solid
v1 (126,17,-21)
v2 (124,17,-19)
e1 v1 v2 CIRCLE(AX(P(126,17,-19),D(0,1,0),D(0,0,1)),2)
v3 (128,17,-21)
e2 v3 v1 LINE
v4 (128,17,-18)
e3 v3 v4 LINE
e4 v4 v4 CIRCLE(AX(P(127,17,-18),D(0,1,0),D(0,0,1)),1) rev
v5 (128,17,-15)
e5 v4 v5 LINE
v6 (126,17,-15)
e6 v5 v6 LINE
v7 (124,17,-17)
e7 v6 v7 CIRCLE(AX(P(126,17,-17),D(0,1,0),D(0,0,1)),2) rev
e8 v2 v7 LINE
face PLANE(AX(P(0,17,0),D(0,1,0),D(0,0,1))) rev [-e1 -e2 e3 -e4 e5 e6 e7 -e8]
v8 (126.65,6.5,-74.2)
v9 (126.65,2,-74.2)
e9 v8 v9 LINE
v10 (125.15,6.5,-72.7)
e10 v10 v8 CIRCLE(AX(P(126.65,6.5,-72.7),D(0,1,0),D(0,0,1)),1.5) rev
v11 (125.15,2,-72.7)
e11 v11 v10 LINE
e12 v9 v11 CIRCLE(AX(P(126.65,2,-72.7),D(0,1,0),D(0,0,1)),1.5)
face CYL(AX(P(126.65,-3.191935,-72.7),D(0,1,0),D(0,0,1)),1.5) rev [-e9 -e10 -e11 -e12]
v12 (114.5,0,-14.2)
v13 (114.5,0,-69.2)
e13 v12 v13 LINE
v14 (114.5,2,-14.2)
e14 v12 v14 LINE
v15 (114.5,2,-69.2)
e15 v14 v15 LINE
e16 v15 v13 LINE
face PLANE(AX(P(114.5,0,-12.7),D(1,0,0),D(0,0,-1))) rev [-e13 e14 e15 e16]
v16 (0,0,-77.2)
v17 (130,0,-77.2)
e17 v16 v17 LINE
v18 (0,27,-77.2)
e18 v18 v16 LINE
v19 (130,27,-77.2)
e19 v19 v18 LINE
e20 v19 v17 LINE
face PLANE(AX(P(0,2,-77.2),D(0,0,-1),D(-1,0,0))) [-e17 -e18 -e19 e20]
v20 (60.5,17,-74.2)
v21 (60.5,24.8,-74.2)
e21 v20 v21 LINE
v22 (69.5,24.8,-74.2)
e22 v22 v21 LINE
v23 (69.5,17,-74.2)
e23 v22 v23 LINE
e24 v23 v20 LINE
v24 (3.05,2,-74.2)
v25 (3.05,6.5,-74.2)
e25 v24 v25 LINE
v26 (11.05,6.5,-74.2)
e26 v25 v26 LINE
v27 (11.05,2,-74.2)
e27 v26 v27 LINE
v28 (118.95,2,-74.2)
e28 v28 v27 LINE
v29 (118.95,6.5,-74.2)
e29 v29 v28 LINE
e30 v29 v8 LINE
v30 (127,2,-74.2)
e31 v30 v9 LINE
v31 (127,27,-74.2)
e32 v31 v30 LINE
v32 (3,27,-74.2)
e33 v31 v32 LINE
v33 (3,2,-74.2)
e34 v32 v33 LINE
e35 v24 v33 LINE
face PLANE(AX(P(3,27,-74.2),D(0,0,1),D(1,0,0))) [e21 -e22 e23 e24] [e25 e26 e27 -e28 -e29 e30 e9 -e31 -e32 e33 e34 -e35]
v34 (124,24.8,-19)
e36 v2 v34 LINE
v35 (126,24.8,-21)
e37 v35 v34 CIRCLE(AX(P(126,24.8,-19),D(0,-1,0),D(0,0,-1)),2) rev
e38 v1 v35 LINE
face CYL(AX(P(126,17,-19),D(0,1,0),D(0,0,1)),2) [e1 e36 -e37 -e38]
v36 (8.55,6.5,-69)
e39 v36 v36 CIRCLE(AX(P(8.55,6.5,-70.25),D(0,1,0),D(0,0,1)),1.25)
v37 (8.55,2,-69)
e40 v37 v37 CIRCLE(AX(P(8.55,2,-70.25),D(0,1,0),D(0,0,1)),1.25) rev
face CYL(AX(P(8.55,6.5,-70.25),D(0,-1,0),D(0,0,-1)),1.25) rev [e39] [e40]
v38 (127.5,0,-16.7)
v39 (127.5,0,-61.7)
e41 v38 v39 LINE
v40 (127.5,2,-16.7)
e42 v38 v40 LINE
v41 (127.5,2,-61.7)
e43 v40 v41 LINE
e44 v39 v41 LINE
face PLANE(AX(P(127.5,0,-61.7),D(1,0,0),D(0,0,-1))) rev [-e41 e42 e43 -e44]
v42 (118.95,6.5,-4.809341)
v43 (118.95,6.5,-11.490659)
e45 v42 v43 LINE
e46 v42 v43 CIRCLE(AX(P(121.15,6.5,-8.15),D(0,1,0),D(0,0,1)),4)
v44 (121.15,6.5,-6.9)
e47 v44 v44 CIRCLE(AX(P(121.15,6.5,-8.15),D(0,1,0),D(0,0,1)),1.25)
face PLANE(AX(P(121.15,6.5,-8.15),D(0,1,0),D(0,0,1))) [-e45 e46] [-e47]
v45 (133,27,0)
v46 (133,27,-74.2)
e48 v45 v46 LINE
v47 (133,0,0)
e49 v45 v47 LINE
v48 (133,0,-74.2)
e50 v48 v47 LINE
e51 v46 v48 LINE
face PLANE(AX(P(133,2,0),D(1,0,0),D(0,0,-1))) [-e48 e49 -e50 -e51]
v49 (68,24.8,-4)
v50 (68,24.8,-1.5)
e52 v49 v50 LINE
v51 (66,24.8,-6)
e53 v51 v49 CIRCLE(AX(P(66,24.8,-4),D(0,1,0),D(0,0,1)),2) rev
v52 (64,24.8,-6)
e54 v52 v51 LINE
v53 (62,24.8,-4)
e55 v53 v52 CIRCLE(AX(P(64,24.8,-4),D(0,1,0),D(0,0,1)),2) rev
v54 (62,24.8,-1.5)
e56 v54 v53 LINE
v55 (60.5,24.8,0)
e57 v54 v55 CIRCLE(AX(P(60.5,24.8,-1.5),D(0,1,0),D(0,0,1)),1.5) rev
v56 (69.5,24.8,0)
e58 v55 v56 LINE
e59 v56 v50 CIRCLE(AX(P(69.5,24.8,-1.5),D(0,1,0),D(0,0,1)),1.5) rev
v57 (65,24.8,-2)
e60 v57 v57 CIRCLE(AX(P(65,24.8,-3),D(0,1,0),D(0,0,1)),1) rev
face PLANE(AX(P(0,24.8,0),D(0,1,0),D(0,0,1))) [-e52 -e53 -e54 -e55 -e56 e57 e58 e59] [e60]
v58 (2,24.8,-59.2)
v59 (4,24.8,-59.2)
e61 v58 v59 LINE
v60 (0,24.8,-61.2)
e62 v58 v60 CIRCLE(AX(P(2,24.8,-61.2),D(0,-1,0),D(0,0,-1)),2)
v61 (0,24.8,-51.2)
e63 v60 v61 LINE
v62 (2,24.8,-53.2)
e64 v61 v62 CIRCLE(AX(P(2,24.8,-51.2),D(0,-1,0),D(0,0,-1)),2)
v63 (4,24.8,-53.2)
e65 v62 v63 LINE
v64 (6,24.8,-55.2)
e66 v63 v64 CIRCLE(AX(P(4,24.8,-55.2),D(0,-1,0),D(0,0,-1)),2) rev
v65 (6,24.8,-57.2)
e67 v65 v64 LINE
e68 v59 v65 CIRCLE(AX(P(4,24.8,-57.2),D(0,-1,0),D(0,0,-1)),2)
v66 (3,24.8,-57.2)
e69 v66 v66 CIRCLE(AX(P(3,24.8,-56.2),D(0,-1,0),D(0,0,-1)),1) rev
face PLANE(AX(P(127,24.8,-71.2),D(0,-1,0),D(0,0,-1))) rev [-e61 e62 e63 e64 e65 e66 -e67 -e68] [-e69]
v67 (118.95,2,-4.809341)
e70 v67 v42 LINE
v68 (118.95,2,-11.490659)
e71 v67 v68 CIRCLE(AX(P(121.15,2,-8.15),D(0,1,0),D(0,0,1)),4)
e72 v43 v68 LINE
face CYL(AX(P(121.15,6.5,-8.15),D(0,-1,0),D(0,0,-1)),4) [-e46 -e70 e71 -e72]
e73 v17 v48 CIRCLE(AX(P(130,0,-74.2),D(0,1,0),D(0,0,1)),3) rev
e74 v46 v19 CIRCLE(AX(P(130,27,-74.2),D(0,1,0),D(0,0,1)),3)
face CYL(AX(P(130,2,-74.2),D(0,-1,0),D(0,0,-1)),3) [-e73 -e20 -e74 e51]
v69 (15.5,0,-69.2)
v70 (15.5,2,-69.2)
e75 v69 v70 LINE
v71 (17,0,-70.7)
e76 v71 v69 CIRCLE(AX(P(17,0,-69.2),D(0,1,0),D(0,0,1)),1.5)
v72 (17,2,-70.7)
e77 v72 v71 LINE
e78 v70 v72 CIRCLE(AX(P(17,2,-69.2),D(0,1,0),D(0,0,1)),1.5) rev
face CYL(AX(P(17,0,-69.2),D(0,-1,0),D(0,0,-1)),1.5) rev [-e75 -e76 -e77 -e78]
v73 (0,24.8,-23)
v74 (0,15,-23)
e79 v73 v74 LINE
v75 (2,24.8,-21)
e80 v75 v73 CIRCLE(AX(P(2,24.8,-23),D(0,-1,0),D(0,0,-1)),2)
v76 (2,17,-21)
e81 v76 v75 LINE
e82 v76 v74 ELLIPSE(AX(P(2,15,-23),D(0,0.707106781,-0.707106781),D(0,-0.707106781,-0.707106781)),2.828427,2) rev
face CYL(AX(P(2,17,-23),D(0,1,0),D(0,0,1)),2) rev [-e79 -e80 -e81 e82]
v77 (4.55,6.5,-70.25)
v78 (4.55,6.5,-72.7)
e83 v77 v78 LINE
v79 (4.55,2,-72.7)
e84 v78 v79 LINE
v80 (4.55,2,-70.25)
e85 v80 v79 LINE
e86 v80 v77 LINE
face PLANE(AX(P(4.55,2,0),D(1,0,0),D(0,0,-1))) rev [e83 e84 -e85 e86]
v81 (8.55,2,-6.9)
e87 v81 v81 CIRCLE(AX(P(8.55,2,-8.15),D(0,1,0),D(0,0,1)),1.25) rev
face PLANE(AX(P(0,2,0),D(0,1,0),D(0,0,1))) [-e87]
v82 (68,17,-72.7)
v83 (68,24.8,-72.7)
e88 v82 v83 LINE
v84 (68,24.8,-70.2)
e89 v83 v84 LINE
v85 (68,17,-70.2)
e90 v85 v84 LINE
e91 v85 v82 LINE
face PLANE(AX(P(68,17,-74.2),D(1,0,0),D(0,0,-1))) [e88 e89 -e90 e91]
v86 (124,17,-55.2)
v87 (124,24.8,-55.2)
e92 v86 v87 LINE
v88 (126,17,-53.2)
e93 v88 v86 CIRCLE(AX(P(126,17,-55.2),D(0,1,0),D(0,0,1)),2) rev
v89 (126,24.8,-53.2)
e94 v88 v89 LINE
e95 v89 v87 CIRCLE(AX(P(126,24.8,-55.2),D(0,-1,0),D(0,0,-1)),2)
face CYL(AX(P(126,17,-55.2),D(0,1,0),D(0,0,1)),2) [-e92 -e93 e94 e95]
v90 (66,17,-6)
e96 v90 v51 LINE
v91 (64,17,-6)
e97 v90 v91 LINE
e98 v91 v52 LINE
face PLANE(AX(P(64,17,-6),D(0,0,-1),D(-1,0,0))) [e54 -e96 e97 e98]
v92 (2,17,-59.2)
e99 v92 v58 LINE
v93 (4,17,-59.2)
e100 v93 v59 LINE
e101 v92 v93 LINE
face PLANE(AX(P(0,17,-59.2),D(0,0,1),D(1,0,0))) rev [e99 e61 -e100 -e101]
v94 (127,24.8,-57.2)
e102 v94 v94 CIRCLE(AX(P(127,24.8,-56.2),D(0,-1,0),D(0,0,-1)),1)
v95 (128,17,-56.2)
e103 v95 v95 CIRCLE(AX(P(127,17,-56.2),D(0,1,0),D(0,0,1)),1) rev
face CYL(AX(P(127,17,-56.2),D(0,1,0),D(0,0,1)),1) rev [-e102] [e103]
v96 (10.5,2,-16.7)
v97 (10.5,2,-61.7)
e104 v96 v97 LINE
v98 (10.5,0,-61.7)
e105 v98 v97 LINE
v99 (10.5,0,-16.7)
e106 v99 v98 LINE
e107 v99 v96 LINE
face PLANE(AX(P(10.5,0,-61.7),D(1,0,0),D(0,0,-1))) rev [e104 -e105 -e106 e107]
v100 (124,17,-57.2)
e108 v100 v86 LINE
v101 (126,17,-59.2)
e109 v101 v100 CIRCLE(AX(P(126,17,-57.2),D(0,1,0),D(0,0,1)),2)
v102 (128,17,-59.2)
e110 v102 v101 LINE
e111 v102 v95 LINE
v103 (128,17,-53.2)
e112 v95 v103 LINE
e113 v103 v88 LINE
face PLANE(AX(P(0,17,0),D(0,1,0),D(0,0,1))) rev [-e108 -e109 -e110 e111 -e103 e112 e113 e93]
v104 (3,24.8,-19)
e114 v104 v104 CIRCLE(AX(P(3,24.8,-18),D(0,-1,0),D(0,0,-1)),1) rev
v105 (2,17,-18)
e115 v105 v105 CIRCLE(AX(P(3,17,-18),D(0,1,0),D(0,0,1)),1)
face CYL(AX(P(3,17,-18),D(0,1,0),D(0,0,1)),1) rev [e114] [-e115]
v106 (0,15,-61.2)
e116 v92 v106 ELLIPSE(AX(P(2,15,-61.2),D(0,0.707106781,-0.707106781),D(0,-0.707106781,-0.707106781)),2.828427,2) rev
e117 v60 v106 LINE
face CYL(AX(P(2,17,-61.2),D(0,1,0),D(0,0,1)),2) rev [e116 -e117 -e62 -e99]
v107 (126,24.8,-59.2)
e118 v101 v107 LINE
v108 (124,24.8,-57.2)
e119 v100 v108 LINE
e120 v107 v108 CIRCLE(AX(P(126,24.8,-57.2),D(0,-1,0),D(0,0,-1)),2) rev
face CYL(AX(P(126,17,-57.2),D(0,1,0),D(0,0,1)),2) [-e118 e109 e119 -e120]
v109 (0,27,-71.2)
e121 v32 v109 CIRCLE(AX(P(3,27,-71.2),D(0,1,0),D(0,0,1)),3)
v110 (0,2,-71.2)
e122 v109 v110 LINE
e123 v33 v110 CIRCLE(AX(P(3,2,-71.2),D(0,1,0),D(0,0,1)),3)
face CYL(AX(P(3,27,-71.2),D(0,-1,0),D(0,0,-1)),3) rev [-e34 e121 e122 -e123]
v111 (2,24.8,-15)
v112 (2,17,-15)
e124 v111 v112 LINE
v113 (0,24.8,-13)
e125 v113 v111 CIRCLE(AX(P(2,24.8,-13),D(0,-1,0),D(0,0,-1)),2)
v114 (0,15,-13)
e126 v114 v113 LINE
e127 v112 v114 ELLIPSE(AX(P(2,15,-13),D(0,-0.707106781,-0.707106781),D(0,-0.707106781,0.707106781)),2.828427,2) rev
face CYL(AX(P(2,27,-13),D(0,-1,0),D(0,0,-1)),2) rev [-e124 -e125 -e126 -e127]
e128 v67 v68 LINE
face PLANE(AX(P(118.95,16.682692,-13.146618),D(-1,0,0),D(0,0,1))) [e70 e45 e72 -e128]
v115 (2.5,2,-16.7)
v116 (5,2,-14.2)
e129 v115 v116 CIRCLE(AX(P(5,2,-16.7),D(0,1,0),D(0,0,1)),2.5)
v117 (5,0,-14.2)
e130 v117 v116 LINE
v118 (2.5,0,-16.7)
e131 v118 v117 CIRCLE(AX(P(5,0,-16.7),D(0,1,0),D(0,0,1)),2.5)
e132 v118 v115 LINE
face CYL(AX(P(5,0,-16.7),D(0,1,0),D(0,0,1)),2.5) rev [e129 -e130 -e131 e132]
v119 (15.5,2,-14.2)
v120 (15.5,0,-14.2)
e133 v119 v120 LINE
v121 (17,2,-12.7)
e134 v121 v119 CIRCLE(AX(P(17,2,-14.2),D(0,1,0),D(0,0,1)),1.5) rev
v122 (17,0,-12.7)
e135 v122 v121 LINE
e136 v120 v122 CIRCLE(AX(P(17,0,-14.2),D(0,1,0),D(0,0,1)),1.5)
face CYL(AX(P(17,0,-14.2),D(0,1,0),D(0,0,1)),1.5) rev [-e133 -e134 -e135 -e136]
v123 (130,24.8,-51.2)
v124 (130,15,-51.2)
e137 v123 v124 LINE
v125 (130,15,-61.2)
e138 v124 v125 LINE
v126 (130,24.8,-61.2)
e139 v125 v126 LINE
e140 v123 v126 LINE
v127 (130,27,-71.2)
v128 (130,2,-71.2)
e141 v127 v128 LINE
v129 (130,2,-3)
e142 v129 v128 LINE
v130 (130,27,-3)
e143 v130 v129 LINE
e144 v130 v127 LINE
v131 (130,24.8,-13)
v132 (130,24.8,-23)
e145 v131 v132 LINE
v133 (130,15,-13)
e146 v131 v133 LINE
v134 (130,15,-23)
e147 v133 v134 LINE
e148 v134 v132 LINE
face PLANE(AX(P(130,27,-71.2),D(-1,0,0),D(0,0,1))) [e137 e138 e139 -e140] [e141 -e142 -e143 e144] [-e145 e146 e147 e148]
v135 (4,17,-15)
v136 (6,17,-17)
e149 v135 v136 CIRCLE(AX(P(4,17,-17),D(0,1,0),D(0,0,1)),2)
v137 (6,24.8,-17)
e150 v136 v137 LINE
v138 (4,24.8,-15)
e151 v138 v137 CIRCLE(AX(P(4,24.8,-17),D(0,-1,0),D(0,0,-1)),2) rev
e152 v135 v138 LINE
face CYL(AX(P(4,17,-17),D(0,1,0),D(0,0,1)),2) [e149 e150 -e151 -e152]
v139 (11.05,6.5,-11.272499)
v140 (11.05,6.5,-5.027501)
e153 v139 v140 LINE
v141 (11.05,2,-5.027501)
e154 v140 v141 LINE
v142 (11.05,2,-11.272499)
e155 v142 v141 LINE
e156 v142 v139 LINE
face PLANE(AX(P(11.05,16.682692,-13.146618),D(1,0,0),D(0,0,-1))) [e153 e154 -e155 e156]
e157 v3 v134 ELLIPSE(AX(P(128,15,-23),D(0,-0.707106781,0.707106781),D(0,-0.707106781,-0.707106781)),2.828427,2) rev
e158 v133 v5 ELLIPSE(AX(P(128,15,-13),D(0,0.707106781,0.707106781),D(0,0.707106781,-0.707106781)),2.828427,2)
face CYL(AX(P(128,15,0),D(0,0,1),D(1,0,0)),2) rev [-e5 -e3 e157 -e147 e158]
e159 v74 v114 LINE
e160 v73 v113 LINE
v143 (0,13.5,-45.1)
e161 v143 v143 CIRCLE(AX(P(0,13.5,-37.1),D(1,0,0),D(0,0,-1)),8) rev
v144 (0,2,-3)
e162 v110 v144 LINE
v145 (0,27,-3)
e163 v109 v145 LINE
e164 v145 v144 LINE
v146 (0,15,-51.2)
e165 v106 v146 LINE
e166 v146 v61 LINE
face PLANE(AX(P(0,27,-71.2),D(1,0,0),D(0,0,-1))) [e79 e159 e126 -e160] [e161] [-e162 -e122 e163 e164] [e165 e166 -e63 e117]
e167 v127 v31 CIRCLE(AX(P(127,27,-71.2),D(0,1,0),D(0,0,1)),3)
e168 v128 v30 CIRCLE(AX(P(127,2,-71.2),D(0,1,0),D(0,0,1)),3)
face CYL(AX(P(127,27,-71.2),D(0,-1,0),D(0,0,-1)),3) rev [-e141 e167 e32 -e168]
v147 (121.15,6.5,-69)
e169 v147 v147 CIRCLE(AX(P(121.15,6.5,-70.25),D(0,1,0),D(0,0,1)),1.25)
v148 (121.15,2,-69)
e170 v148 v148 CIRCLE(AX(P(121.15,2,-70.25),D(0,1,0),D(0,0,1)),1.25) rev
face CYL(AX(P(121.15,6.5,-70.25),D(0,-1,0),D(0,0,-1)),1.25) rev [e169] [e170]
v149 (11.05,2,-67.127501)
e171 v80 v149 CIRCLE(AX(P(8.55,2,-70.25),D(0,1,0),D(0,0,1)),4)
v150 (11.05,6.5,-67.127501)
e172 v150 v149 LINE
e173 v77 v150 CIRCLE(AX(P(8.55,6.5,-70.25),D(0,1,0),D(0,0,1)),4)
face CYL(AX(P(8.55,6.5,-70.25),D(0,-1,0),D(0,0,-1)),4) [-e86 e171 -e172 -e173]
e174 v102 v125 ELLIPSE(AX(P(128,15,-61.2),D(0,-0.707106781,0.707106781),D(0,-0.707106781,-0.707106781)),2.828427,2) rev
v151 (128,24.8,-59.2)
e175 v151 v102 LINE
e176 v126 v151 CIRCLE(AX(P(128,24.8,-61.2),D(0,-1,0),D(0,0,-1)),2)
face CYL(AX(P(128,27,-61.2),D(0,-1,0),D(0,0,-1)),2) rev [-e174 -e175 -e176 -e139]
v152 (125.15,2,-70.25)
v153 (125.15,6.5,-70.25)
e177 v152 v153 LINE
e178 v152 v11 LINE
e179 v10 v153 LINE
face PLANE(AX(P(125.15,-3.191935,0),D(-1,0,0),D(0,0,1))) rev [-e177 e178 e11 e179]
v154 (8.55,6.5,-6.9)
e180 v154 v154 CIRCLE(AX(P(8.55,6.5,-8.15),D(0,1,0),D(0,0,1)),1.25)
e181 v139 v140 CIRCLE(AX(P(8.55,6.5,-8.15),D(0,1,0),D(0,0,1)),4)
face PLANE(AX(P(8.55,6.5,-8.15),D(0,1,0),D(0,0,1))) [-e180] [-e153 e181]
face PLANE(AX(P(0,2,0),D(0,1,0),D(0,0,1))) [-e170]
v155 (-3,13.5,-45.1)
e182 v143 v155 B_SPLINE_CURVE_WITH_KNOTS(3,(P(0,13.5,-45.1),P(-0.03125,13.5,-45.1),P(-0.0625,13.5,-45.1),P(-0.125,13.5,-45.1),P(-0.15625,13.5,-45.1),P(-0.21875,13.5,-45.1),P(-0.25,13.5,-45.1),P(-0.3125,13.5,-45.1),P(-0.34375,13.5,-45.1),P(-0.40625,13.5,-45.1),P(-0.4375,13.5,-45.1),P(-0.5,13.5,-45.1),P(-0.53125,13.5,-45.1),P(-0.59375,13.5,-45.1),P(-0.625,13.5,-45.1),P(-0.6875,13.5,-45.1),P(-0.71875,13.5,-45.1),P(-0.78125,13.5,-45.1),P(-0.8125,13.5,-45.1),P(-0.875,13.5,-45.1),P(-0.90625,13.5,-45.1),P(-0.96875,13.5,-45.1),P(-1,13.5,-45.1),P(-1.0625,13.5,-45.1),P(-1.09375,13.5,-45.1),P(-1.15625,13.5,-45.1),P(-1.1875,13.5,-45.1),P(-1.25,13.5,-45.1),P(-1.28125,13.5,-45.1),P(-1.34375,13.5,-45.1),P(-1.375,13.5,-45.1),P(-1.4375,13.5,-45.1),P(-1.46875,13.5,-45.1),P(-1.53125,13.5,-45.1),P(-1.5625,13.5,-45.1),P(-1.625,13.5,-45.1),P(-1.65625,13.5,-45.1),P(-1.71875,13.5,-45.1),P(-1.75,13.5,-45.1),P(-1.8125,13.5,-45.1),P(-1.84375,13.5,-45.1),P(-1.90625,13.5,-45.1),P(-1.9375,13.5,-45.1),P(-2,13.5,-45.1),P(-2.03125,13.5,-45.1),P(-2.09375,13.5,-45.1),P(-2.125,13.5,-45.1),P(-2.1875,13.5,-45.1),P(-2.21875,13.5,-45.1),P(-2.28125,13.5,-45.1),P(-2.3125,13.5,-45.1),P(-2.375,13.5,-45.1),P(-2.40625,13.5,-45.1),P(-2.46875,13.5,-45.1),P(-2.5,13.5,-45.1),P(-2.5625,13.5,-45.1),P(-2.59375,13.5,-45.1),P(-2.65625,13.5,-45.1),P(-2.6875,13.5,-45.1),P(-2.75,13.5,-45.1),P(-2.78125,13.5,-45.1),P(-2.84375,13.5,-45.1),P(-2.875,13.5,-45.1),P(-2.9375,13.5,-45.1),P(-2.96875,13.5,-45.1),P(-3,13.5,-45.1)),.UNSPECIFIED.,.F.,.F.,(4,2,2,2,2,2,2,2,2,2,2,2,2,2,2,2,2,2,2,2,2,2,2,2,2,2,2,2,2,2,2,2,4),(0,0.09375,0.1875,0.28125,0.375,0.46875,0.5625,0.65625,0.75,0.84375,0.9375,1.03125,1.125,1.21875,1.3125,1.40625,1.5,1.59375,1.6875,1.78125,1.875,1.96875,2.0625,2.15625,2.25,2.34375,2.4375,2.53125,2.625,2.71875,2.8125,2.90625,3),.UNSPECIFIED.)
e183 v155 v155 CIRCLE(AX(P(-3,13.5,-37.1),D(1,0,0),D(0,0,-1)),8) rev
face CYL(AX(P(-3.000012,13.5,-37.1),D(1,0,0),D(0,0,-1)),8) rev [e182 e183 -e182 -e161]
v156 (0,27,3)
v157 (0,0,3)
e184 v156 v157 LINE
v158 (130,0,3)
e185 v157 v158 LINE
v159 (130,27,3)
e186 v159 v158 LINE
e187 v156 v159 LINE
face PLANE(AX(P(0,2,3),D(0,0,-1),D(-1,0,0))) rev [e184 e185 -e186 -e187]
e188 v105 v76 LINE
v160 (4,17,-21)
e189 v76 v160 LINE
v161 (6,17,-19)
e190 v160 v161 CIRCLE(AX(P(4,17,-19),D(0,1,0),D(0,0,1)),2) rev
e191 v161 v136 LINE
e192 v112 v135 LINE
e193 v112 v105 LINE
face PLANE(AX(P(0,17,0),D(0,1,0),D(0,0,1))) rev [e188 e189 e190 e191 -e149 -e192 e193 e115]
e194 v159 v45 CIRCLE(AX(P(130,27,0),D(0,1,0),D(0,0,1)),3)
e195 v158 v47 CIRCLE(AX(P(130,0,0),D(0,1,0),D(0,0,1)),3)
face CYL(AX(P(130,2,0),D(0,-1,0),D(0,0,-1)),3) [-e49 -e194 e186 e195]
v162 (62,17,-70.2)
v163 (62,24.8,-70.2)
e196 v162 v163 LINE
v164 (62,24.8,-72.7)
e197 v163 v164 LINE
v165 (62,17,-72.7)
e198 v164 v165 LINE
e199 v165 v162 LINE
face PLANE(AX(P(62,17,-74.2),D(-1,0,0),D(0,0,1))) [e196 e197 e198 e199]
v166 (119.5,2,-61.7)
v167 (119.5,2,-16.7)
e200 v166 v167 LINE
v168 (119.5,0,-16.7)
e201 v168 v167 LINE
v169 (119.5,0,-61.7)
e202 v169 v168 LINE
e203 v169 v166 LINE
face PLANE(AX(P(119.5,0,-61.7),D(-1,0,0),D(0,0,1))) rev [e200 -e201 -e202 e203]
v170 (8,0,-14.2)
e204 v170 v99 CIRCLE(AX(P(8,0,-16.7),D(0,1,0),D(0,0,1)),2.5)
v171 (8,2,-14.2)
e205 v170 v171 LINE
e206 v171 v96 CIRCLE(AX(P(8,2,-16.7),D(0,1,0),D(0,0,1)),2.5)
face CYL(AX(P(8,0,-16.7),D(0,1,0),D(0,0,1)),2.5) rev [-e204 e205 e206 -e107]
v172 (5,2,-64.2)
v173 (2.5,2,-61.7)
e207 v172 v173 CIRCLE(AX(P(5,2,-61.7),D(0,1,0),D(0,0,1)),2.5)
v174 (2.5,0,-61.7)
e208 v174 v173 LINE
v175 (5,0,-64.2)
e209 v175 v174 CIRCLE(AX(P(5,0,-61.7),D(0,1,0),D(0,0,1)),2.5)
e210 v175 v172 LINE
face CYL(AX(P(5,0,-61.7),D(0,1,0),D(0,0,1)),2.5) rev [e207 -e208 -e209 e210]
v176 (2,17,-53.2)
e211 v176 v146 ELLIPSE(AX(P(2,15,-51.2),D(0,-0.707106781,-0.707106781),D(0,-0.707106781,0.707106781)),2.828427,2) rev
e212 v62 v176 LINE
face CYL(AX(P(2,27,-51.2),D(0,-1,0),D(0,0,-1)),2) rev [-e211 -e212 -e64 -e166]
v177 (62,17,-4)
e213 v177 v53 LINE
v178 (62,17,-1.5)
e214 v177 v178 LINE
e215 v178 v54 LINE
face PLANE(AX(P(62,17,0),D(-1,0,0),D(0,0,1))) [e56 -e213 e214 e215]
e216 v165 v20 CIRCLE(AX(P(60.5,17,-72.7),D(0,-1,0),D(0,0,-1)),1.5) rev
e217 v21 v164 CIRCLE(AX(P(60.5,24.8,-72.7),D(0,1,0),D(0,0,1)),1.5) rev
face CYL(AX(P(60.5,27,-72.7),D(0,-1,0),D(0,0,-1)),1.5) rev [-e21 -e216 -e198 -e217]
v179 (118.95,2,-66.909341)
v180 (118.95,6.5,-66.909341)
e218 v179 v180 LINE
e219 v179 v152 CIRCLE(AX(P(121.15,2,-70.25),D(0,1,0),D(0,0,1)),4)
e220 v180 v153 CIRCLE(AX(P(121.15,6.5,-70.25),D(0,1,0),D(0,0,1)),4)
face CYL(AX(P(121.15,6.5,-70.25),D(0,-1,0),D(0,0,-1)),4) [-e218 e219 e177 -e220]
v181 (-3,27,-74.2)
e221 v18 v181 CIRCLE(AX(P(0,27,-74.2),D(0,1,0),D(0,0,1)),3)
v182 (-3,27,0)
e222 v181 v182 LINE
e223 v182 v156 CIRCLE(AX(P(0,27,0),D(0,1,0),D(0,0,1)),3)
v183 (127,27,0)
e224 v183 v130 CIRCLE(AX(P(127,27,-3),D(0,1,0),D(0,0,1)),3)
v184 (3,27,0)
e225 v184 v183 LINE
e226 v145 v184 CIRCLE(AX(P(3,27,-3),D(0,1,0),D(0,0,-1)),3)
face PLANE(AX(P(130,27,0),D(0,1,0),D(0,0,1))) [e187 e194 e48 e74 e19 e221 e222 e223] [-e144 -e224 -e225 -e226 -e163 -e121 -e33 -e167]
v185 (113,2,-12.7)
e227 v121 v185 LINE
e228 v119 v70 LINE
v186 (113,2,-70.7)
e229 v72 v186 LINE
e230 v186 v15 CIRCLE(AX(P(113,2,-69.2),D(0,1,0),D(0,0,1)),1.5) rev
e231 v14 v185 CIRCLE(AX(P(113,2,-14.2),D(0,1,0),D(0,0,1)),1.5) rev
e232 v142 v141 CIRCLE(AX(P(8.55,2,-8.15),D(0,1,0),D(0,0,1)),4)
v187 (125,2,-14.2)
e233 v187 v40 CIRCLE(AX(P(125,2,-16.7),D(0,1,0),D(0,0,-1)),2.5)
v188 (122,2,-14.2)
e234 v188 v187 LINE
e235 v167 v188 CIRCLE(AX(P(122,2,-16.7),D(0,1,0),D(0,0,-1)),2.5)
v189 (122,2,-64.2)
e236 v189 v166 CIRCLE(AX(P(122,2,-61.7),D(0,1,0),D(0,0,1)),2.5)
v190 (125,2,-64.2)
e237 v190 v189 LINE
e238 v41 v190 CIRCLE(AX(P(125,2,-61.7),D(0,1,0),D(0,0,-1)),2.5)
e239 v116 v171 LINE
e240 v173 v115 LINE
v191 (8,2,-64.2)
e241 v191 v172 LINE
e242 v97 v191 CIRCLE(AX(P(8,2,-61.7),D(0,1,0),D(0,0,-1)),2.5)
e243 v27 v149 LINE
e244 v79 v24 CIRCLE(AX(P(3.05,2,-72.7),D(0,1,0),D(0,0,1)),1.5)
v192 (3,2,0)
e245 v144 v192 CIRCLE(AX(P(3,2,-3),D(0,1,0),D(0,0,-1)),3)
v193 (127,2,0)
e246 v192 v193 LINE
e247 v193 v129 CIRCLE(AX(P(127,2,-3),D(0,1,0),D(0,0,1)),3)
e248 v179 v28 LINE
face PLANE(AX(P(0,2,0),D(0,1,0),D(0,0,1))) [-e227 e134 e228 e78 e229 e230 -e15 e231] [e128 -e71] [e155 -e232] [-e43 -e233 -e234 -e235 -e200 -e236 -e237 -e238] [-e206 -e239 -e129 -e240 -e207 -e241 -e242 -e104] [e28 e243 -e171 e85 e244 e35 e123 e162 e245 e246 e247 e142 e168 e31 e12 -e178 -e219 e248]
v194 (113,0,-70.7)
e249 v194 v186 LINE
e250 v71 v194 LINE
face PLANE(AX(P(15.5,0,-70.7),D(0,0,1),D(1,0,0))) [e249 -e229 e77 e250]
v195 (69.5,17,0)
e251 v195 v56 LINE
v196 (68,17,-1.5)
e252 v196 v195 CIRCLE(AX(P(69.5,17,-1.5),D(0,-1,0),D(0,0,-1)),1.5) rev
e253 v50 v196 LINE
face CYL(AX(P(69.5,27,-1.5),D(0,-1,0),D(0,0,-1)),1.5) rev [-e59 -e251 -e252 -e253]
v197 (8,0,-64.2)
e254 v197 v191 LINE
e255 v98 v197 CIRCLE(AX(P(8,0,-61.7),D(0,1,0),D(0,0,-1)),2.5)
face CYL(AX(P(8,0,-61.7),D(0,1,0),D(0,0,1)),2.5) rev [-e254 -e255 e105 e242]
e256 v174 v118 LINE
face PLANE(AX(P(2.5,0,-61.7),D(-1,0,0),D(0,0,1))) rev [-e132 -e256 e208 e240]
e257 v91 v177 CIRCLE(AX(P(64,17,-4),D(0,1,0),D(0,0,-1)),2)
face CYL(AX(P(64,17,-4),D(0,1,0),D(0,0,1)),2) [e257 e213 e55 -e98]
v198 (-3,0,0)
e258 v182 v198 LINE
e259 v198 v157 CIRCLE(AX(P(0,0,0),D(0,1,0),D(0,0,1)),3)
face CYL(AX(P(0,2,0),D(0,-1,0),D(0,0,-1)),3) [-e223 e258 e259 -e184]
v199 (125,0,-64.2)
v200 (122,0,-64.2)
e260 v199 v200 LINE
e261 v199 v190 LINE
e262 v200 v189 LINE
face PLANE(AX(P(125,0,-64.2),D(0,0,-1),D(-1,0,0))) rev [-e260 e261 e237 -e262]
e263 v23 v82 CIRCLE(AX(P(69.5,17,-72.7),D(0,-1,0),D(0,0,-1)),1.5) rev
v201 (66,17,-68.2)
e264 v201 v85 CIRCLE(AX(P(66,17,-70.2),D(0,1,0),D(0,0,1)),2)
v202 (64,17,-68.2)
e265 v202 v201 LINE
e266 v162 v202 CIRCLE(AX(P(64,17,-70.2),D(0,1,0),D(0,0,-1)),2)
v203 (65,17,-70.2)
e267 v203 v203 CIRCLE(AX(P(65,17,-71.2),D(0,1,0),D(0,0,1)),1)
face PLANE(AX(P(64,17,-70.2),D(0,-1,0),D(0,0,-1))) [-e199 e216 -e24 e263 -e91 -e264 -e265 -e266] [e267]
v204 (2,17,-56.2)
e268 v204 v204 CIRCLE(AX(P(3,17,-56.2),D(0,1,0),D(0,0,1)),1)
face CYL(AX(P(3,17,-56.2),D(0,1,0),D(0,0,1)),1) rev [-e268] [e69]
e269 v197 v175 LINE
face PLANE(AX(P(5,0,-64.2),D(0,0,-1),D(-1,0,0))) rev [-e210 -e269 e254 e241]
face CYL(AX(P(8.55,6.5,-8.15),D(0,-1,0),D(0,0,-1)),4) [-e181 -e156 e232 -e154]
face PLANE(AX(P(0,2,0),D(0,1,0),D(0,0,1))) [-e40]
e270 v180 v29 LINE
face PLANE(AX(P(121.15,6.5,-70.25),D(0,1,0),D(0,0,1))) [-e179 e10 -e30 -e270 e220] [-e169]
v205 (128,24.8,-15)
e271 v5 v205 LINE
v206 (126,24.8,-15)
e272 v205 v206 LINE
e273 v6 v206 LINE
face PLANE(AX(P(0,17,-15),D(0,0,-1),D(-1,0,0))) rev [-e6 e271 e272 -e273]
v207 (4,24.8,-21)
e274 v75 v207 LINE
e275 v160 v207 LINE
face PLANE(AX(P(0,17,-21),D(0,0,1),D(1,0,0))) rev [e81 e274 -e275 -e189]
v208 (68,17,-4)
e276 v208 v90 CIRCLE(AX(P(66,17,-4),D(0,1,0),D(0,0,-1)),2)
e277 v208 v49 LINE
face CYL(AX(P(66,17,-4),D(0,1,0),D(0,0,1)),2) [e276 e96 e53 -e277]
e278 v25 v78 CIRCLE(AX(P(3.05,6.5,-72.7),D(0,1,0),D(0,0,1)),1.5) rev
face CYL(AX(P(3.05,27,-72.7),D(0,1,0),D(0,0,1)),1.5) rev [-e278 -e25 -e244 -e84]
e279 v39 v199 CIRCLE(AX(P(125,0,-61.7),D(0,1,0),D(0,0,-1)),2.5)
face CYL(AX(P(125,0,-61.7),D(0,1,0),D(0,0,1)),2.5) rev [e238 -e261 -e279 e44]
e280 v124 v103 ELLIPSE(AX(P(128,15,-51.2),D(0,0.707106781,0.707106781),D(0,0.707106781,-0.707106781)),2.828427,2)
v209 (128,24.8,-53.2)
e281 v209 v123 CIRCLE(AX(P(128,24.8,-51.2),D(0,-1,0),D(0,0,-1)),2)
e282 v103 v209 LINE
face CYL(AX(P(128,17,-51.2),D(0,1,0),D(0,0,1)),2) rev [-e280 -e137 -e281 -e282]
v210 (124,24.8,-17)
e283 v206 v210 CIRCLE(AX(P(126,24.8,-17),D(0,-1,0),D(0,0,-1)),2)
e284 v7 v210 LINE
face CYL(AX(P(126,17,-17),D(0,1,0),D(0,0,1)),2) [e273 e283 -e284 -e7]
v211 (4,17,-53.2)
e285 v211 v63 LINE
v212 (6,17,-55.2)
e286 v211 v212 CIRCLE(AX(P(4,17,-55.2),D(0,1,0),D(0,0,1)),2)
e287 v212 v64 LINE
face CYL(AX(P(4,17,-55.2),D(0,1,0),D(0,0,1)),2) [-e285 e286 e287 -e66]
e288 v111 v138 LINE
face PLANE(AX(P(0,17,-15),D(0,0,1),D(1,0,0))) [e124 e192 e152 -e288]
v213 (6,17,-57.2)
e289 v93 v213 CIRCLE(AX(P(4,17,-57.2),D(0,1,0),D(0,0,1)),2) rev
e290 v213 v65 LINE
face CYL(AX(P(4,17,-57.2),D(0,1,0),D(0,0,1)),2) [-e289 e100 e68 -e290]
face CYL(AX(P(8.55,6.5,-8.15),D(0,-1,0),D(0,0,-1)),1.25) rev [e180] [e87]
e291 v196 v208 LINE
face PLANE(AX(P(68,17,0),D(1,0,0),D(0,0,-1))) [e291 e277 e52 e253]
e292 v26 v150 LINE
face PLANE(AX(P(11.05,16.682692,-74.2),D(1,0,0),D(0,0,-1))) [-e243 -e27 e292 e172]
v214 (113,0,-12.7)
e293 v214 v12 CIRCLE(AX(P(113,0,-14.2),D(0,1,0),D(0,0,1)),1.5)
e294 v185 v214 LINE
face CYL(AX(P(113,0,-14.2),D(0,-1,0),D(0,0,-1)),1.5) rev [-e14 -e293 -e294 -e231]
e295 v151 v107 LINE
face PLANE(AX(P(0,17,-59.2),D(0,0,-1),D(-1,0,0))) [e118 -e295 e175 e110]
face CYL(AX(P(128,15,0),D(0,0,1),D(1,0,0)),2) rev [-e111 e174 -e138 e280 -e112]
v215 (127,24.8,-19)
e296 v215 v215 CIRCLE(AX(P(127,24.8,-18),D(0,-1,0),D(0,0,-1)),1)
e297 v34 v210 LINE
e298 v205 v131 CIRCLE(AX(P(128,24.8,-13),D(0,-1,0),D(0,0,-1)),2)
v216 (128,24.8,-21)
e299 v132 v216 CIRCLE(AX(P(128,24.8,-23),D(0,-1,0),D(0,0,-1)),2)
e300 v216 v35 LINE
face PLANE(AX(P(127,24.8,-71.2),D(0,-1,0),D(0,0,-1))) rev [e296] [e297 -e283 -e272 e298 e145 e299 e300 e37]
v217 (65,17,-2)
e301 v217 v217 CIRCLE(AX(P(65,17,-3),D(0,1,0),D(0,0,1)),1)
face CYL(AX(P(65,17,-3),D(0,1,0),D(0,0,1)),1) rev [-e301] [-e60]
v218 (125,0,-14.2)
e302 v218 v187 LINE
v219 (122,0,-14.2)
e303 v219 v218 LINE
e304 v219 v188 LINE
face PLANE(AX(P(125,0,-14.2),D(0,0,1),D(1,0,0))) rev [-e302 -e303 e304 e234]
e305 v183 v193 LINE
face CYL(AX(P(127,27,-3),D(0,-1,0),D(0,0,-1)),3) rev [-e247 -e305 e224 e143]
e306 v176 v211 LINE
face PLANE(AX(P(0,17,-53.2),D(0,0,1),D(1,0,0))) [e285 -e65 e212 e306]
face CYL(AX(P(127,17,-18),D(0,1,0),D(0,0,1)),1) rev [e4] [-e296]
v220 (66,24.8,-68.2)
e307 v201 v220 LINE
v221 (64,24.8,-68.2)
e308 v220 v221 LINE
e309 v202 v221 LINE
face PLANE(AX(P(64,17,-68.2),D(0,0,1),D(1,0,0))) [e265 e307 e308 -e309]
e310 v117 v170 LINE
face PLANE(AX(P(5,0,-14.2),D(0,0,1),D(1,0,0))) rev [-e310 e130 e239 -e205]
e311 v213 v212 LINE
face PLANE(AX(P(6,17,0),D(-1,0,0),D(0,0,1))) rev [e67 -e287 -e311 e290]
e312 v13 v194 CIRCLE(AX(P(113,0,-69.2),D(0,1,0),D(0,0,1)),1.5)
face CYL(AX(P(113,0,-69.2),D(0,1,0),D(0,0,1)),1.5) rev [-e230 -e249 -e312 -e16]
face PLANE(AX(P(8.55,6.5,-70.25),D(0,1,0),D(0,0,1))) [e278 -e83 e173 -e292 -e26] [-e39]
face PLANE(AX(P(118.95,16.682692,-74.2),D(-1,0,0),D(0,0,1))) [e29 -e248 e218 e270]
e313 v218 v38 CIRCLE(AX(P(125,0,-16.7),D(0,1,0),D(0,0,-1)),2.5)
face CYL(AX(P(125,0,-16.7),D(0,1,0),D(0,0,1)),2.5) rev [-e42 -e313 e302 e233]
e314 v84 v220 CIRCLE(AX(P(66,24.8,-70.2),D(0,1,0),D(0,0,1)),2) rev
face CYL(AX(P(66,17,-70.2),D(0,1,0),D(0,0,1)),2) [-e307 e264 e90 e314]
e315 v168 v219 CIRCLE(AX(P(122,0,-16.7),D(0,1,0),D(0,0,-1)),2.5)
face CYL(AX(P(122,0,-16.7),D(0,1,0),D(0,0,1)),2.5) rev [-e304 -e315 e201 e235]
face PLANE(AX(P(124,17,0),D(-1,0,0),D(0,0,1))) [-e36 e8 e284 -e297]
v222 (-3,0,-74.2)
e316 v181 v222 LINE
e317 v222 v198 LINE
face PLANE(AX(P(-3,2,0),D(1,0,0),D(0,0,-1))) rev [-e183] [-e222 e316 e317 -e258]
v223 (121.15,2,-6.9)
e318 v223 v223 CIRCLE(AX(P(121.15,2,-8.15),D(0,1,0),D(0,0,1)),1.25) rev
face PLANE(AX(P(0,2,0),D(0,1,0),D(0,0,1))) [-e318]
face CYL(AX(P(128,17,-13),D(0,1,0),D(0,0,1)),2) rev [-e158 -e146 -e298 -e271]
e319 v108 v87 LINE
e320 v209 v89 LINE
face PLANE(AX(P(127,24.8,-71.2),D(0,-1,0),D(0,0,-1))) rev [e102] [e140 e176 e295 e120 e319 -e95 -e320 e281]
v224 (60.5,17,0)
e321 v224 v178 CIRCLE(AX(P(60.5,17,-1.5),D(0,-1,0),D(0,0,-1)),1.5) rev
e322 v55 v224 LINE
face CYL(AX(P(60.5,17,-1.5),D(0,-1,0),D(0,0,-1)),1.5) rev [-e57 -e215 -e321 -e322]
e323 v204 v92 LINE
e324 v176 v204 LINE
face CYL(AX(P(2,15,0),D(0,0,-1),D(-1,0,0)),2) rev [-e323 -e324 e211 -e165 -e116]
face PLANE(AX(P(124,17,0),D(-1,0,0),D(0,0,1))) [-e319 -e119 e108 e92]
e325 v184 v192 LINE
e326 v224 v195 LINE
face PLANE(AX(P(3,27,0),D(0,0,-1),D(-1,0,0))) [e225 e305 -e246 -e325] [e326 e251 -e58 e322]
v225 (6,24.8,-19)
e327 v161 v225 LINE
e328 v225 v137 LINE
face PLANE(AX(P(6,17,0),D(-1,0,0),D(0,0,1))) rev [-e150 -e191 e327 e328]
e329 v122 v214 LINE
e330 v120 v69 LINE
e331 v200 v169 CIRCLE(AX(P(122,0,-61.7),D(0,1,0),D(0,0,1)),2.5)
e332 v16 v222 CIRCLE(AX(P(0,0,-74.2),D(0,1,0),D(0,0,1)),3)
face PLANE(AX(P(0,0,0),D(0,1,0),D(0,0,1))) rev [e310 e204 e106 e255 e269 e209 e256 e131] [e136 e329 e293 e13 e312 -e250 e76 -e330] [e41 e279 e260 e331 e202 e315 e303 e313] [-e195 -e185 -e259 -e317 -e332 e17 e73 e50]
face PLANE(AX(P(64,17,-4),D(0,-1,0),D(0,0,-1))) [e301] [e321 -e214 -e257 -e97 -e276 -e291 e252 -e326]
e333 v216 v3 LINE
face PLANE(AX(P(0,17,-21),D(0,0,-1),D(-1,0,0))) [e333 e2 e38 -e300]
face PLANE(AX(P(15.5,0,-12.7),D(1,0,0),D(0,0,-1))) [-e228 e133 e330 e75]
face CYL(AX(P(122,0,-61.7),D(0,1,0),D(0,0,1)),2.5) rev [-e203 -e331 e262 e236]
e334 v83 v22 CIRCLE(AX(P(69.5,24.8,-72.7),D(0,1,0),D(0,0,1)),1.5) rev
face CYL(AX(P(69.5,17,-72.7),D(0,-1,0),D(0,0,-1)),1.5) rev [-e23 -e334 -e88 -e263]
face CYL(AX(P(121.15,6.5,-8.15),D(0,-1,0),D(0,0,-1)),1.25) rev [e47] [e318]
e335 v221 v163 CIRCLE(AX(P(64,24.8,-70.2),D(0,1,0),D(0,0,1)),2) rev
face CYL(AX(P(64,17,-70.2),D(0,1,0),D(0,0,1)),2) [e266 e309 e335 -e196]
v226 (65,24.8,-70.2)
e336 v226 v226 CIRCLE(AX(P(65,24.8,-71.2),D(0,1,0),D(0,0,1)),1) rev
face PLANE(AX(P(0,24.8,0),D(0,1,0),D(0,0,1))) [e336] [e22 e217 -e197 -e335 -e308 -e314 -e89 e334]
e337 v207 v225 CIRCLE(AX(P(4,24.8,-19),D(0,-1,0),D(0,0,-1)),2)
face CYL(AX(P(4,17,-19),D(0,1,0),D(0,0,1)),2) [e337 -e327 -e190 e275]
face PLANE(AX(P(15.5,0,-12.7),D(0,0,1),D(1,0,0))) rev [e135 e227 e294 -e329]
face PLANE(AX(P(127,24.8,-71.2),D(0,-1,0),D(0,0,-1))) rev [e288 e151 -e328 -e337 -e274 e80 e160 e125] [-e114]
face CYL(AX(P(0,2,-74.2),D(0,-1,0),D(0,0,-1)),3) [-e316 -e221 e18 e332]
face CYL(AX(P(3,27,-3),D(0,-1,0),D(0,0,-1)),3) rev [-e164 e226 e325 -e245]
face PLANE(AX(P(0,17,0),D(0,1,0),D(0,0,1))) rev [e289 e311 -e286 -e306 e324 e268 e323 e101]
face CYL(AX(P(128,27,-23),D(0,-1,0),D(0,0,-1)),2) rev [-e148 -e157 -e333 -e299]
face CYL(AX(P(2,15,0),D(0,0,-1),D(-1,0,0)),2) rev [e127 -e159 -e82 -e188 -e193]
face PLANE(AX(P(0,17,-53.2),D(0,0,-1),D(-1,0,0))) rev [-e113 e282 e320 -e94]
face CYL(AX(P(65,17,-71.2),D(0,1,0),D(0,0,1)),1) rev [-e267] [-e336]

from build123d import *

# Parameters (mm, degrees)
BOSS_EXTRUDE2_DEPTH            = 2
SKETCH3_R                      = 1
SKETCH3_W                      = 99
SKETCH3_H                      = 58
CUT_EXTRUDE1_DEPTH             = 2
SKETCH5_R                      = 4
SKETCH5_R_2                    = 1.25
BOSS_EXTRUDE4_DEPTH            = 4.5
BOSS_EXTRUDE5_DEPTH            = 25
BOSS_EXTRUDE6_START            = -2
SKETCH7_R                      = 1
BOSS_EXTRUDE6_DEPTH            = 2
BOSS_EXTRUDE8_DEPTH            = 10
CUT_EXTRUDE2_START             = -2.2
CUT_EXTRUDE2_DEPTH             = 2.2
FILLET2_R                      = 1.5
FILLET3_R                      = 2
BOSS_EXTRUDE11_START           = -4.5
BOSS_EXTRUDE11_DEPTH           = 4.5
BOSS_EXTRUDE12_START           = -4.5
BOSS_EXTRUDE12_DEPTH           = 4.5
CUT_EXTRUDE3_REACH             = 160.697
SKETCH16_R                     = 8
CUT_EXTRUDE3_DIRECTION_2_DEPTH = 159.697321969
SKETCH17_R                     = 1
BOSS_EXTRUDE14_DEPTH           = 10
SKETCH20_R                     = 1
BOSS_EXTRUDE15_DEPTH           = 10
FILLET6_R                      = 1.5
SKETCH22_W                     = 21.854456245
SKETCH22_H                     = 74.2
CUT_EXTRUDE4_DEPTH             = 2.2
CUT_EXTRUDE5_DEPTH             = 156.800641847
SKETCH28_W                     = 3.653632657
SKETCH28_H                     = 8
SKETCH28_H_2                   = 9.504640586
CUT_EXTRUDE6_DEPTH             = 4.5


with BuildPart() as part:
    # Sketch2 → Boss-Extrude2 (new body)
    with BuildSketch(Plane(origin=(0, 0, 0), x_dir=(1, 0, 0), z_dir=(0, 1, 0))):
        with BuildLine():
            Line((0, 77.2), (130, 77.2))
            ThreePointArc((130, 77.2), (132.121320344, 76.321320344), (133, 74.2))
            Line((133, 74.2), (133, 0))
            ThreePointArc((133, 0), (132.121320344, -2.121320344), (130, -3))
            Line((130, -3), (0, -3))
            ThreePointArc((0, -3), (-2.121320344, -2.121320344), (-3, 0))
            Line((-3, 0), (-3, 74.2))
            ThreePointArc((-3, 74.2), (-2.121320344, 76.321320344), (0, 77.2))
        make_face()
    extrude(amount=BOSS_EXTRUDE2_DEPTH)

    # Sketch3 → Cut-Extrude1 (cut)
    with BuildSketch(Plane(origin=(0, 2, 0), x_dir=(1, 0, 0), z_dir=(0, 1, 0))):
        with Locations(Location((8.55, 70.25, 0), (0, 0, 270))):
            Circle(SKETCH3_R)
        with Locations(Location((8.55, 8.15, 0), (0, 0, 270))):
            Circle(SKETCH3_R)
        with Locations(Location((121.15, 8.15, 0), (0, 0, 270))):
            Circle(SKETCH3_R)
        with Locations(Location((121.15, 70.25, 0), (0, 0, 270))):
            Circle(SKETCH3_R)
        with Locations((65, 41.7)):
            Rectangle(SKETCH3_W, SKETCH3_H)
    extrude(amount=-CUT_EXTRUDE1_DEPTH, mode=Mode.SUBTRACT)

    # Sketch5 → Boss-Extrude4 (add)
    # profile 1 of 4: a face of its own
    with BuildSketch(Plane(origin=(0, 2, 0), x_dir=(1, 0, 0), z_dir=(0, 1, 0))):
        with Locations(Location((8.55, 70.25, 0), (0, 0, 270))):
            Circle(SKETCH5_R)
        with Locations(Location((8.55, 70.25, 0), (0, 0, 270))):
            Circle(SKETCH5_R_2, mode=Mode.SUBTRACT)
    # profile 2 of 4: a face of its own
    with BuildSketch(Plane(origin=(0, 2, 0), x_dir=(1, 0, 0), z_dir=(0, 1, 0))):
        with Locations(Location((8.55, 8.15, 0), (0, 0, 270))):
            Circle(SKETCH5_R)
        with Locations(Location((8.55, 8.15, 0), (0, 0, 270))):
            Circle(SKETCH5_R_2, mode=Mode.SUBTRACT)
    # profile 3 of 4: a face of its own
    with BuildSketch(Plane(origin=(0, 2, 0), x_dir=(1, 0, 0), z_dir=(0, 1, 0))):
        with Locations(Location((121.15, 8.15, 0), (0, 0, 270))):
            Circle(SKETCH5_R)
        with Locations(Location((121.15, 8.15, 0), (0, 0, 270))):
            Circle(SKETCH5_R_2, mode=Mode.SUBTRACT)
    # profile 4 of 4: a face of its own
    with BuildSketch(Plane(origin=(0, 2, 0), x_dir=(1, 0, 0), z_dir=(0, 1, 0))):
        with Locations(Location((121.15, 70.25, 0), (0, 0, 270))):
            Circle(SKETCH5_R)
        with Locations(Location((121.15, 70.25, 0), (0, 0, 270))):
            Circle(SKETCH5_R_2, mode=Mode.SUBTRACT)
    extrude(amount=BOSS_EXTRUDE4_DEPTH)

    # Sketch6 → Boss-Extrude5 (add)
    with BuildSketch(Plane(origin=(0, 2, 0), x_dir=(1, 0, 0), z_dir=(0, 1, 0))):
        with BuildLine():
            Line((0, 77.2), (130, 77.2))
            ThreePointArc((130, 77.2), (132.121320344, 76.321320344), (133, 74.2))
            Line((133, 74.2), (133, 0))
            ThreePointArc((133, 0), (132.121320344, -2.121320344), (130, -3))
            Line((130, -3), (0, -3))
            ThreePointArc((0, -3), (-2.121320344, -2.121320344), (-3, 0))
            Line((-3, 0), (-3, 74.2))
            ThreePointArc((-3, 74.2), (-2.121320344, 76.321320344), (0, 77.2))
        make_face()
        with BuildLine():
            Line((3, 74.2), (127, 74.2))
            ThreePointArc((127, 74.2), (129.121320344, 73.321320344), (130, 71.2))
            Line((130, 71.2), (130, 3))
            ThreePointArc((130, 3), (129.121320344, 0.878679656), (127, 0))
            Line((127, 0), (3, 0))
            ThreePointArc((3, 0), (0.878679656, 0.878679656), (0, 3))
            Line((0, 3), (0, 71.2))
            ThreePointArc((0, 71.2), (0.878679656, 73.321320344), (3, 74.2))
        make_face(mode=Mode.SUBTRACT)
    extrude(amount=BOSS_EXTRUDE5_DEPTH)

    # Sketch7 → Boss-Extrude6 (add)
    with BuildSketch(Plane.XZ.offset(BOSS_EXTRUDE6_START)):
        with Locations((8.55, -8.15)):
            Circle(SKETCH7_R)
        with Locations((8.55, -70.25)):
            Circle(SKETCH7_R)
        with Locations((121.15, -70.25)):
            Circle(SKETCH7_R)
        with Locations((121.15, -8.15)):
            Circle(SKETCH7_R)
    extrude(amount=BOSS_EXTRUDE6_DEPTH)

    # Sketch10 → Boss-Extrude8 (add)
    with BuildSketch(Plane(origin=(0, 27, 0), x_dir=(1, 0, 0), z_dir=(0, 1, 0))):
        with BuildLine():
            Line((4, 59.2), (0, 59.2))
            Line((0, 59.2), (2.292893219, 56.907106781))
            ThreePointArc((2.292893219, 56.907106781), (3.382683432, 57.123879533), (4, 56.2))
            ThreePointArc((4, 56.2), (3.923879533, 55.817316568), (3.707106781, 55.492893219))
            Line((3.707106781, 55.492893219), (5.414213562, 53.785786438))
            ThreePointArc((5.414213562, 53.785786438), (5.847759065, 54.434633135), (6, 55.2))
            Line((6, 55.2), (6, 57.2))
            ThreePointArc((6, 57.2), (5.414213562, 58.614213562), (4, 59.2))
        make_face()
        with BuildLine():
            Line((2.292893219, 56.907106781), (0, 59.2))
            Line((0, 59.2), (0, 53.2))
            Line((0, 53.2), (4, 53.2))
            ThreePointArc((4, 53.2), (4.765366865, 53.352240935), (5.414213562, 53.785786438))
            Line((5.414213562, 53.785786438), (3.707106781, 55.492893219))
            ThreePointArc((3.707106781, 55.492893219), (2.292893219, 55.492893219), (2.292893219, 56.907106781))
        make_face()
        with BuildLine():
            Line((2.292893219, 18.707106781), (0, 21))
            Line((0, 21), (0, 15))
            Line((0, 15), (4, 15))
            ThreePointArc((4, 15), (4.765366865, 15.152240935), (5.414213562, 15.585786438))
            Line((5.414213562, 15.585786438), (3.707106781, 17.292893219))
            ThreePointArc((3.707106781, 17.292893219), (2.292893219, 17.292893219), (2.292893219, 18.707106781))
        make_face()
        with BuildLine():
            Line((4, 21), (0, 21))
            Line((0, 21), (2.292893219, 18.707106781))
            ThreePointArc((2.292893219, 18.707106781), (3.382683432, 18.923879533), (4, 18))
            ThreePointArc((4, 18), (3.923879533, 17.617316568), (3.707106781, 17.292893219))
            Line((3.707106781, 17.292893219), (5.414213562, 15.585786438))
            ThreePointArc((5.414213562, 15.585786438), (5.847759065, 16.234633135), (6, 17))
            Line((6, 17), (6, 19))
            ThreePointArc((6, 19), (5.414213562, 20.414213562), (4, 21))
        make_face()
        with BuildLine():
            Line((130, 53.2), (130, 59.2))
            Line((130, 59.2), (127.707106781, 56.907106781))
            ThreePointArc((127.707106781, 56.907106781), (127.923879533, 56.582683432), (128, 56.2))
            ThreePointArc((128, 56.2), (127.382683432, 55.276120467), (126.292893219, 55.492893219))
            Line((126.292893219, 55.492893219), (124.585786438, 53.785786438))
            ThreePointArc((124.585786438, 53.785786438), (125.234633135, 53.352240935), (126, 53.2))
            Line((126, 53.2), (130, 53.2))
        make_face()
        with BuildLine():
            Line((127.707106781, 56.907106781), (130, 59.2))
            Line((130, 59.2), (126, 59.2))
            ThreePointArc((126, 59.2), (124.585786438, 58.614213562), (124, 57.2))
            Line((124, 57.2), (124, 55.2))
            ThreePointArc((124, 55.2), (124.152240935, 54.434633135), (124.585786438, 53.785786438))
            Line((124.585786438, 53.785786438), (126.292893219, 55.492893219))
            ThreePointArc((126.292893219, 55.492893219), (126.292893219, 56.907106781), (127.707106781, 56.907106781))
        make_face()
        with BuildLine():
            Line((130, 15), (130, 21))
            Line((130, 21), (127.707106781, 18.707106781))
            ThreePointArc((127.707106781, 18.707106781), (127.923879533, 18.382683432), (128, 18))
            ThreePointArc((128, 18), (127.382683432, 17.076120467), (126.292893219, 17.292893219))
            Line((126.292893219, 17.292893219), (124.585786438, 15.585786438))
            ThreePointArc((124.585786438, 15.585786438), (125.234633135, 15.152240935), (126, 15))
            Line((126, 15), (130, 15))
        make_face()
        with BuildLine():
            Line((127.707106781, 18.707106781), (130, 21))
            Line((130, 21), (126, 21))
            ThreePointArc((126, 21), (124.585786438, 20.414213562), (124, 19))
            Line((124, 19), (124, 17))
            ThreePointArc((124, 17), (124.152240935, 16.234633135), (124.585786438, 15.585786438))
            Line((124.585786438, 15.585786438), (126.292893219, 17.292893219))
            ThreePointArc((126.292893219, 17.292893219), (126.292893219, 18.707106781), (127.707106781, 18.707106781))
        make_face()
    extrude(amount=-BOSS_EXTRUDE8_DEPTH)

    # Sketch11 → Cut-Extrude2 (cut)
    with BuildSketch(Plane(origin=(0, 27, 0), x_dir=(1, 0, 0), z_dir=(0, 1, 0)).offset(CUT_EXTRUDE2_START)):
        with BuildLine():
            Line((3, 74.2), (127, 74.2))
            ThreePointArc((127, 74.2), (129.121320344, 73.321320344), (130, 71.2))
            Line((130, 71.2), (130, 3))
            ThreePointArc((130, 3), (129.121320344, 0.878679656), (127, 0))
            Line((127, 0), (3, 0))
            ThreePointArc((3, 0), (0.878679656, 0.878679656), (0, 3))
            Line((0, 3), (0, 71.2))
            ThreePointArc((0, 71.2), (0.878679656, 73.321320344), (3, 74.2))
        make_face()
    extrude(amount=CUT_EXTRUDE2_DEPTH, mode=Mode.SUBTRACT)

    # Fillet2
    fillet2_edges = [part.edges().sort_by_distance(p)[0] for p in [
        (15.5, 1, -70.7),
        (114.5, 1, -70.7),
        (114.5, 1, -12.7),
        (15.5, 1, -12.7),
    ]]
    fillet(fillet2_edges, radius=FILLET2_R)

    # Fillet3
    fillet3_edges = [part.edges().sort_by_distance(p)[0] for p in [
        (0, 20.9, -53.2),
        (0, 20.9, -59.2),
        (0, 17, -56.2),
        (0, 20.9, -21),
        (0, 20.9, -15),
        (0, 17, -18),
        (130, 20.9, -59.2),
        (130, 20.9, -53.2),
        (130, 17, -56.2),
        (130, 20.9, -21),
        (130, 20.9, -15),
        (130, 17, -18),
    ]]
    fillet(fillet3_edges, radius=FILLET3_R - 0.0001)  # a hair under: the kernel refuses the full size

    # Sketch14 → Boss-Extrude11 (add)
    with BuildSketch(Plane(origin=(0, 6.5, 0), x_dir=(1, 0, 0), z_dir=(0, 1, 0)).offset(BOSS_EXTRUDE11_START)):
        with BuildLine():
            Line((4.55, 74.2), (4.55, 70.25))
            ThreePointArc((4.55, 70.25), (5.506818766, 72.845967638), (7.919523989, 74.2))
            Line((7.919523989, 74.2), (4.55, 74.2))
        make_face()
        with BuildLine():
            ThreePointArc((9.180476011, 74.2), (11.593181234, 72.845967638), (12.55, 70.25))
            Line((12.55, 70.25), (12.55, 74.2))
            Line((12.55, 74.2), (9.180476011, 74.2))
        make_face()
    extrude(amount=BOSS_EXTRUDE11_DEPTH)

    # Sketch15 → Boss-Extrude12 (add)
    with BuildSketch(Plane(origin=(0, 6.5, 0), x_dir=(1, 0, 0), z_dir=(0, 1, 0)).offset(BOSS_EXTRUDE12_START)):
        with BuildLine():
            Line((117.15, 74.2), (117.15, 70.25))
            ThreePointArc((117.15, 70.25), (118.106818766, 72.845967638), (120.519523989, 74.2))
            Line((120.519523989, 74.2), (117.15, 74.2))
        make_face()
        with BuildLine():
            ThreePointArc((121.780476011, 74.2), (124.193181234, 72.845967638), (125.15, 70.25))
            Line((125.15, 70.25), (125.15, 74.2))
            Line((125.15, 74.2), (121.780476011, 74.2))
        make_face()
    extrude(amount=BOSS_EXTRUDE12_DEPTH)

    # Sketch16 → Cut-Extrude3 (cut, up to next)
    with BuildSketch(Plane.ZY.offset(3), mode=Mode.PRIVATE) as cut_extrude3_sk1:
        with Locations(Location((-37.1, 13.5, 0), (0, 0, 180))):
            Circle(SKETCH16_R)
    cut_extrude3_tool1 = extrude(cut_extrude3_sk1.sketch, amount=-CUT_EXTRUDE3_REACH, mode=Mode.PRIVATE) & part.part
    add(cut_extrude3_tool1.solids().sort_by_distance((-3, 13.5, -37.1))[0], mode=Mode.SUBTRACT)

    # Sketch16 → Cut-Extrude3 direction 2 (cut)
    with BuildSketch(Plane.ZY.offset(3)):
        with Locations(Location((-37.1, 13.5, 0), (0, 0, 180))):
            Circle(SKETCH16_R)
    extrude(amount=CUT_EXTRUDE3_DIRECTION_2_DEPTH, mode=Mode.SUBTRACT)

    # Sketch17 → Boss-Extrude14 (add)
    with BuildSketch(Plane(origin=(0, 27, 0), x_dir=(1, 0, 0), z_dir=(0, 1, 0))):
        with BuildLine():
            Line((62, 74.2), (68, 74.2))
            Line((68, 74.2), (68, 70.2))
            ThreePointArc((68, 70.2), (67.414213562, 68.785786438), (66, 68.2))
            Line((66, 68.2), (64, 68.2))
            ThreePointArc((64, 68.2), (62.585786438, 68.785786438), (62, 70.2))
            Line((62, 70.2), (62, 74.2))
        make_face()
        with Locations(Location((65, 71.2, 0), (0, 0, 270))):
            Circle(SKETCH17_R, mode=Mode.SUBTRACT)
    extrude(amount=-BOSS_EXTRUDE14_DEPTH)

    # Sketch20 → Boss-Extrude15 (add)
    with BuildSketch(Plane(origin=(0, 27, 0), x_dir=(1, 0, 0), z_dir=(0, 1, 0))):
        with BuildLine():
            Line((62, 0), (68, 0))
            Line((68, 0), (68, 4))
            ThreePointArc((68, 4), (67.414213562, 5.414213562), (66, 6))
            Line((66, 6), (64, 6))
            ThreePointArc((64, 6), (62.585786438, 5.414213562), (62, 4))
            Line((62, 4), (62, 0))
        make_face()
        with Locations(Location((65, 3, 0), (0, 0, 270))):
            Circle(SKETCH20_R, mode=Mode.SUBTRACT)
    extrude(amount=-BOSS_EXTRUDE15_DEPTH)

    # Fillet6
    fillet6_edges = [part.edges().sort_by_distance(p)[0] for p in [
        (4.55, 4.25, -74.2),
        (12.55, 4.25, -74.2),
        (117.15, 4.25, -74.2),
        (125.15, 4.25, -74.2),
        (62, 22, -74.2),
        (68, 22, -74.2),
        (62, 22, 0),
        (68, 22, 0),
    ]]
    fillet(fillet6_edges, radius=FILLET6_R)

    # Sketch22 → Cut-Extrude4 (cut)
    with BuildSketch(Plane(origin=(0, 27, 0), x_dir=(1, 0, 0), z_dir=(0, 1, 0))):
        with Locations((65.381182377, 37.1)):
            Rectangle(SKETCH22_W, SKETCH22_H)
    extrude(amount=-CUT_EXTRUDE4_DEPTH, mode=Mode.SUBTRACT)

    # Sketch27 → Cut-Extrude5 (cut, through all)
    with BuildSketch(Plane(origin=(0, 2, 0), x_dir=(1, 0, 0), z_dir=(0, 1, 0))):
        with BuildLine():
            Line((5, 64.2), (8, 64.2))
            ThreePointArc((8, 64.2), (9.767766953, 63.467766953), (10.5, 61.7))
            Line((10.5, 61.7), (10.5, 16.7))
            ThreePointArc((10.5, 16.7), (9.767766953, 14.932233047), (8, 14.2))
            Line((8, 14.2), (5, 14.2))
            ThreePointArc((5, 14.2), (3.232233047, 14.932233047), (2.5, 16.7))
            Line((2.5, 16.7), (2.5, 61.7))
            ThreePointArc((2.5, 61.7), (3.232233047, 63.467766953), (5, 64.2))
        make_face()
        with BuildLine():
            Line((119.5, 61.7), (119.5, 16.7))
            ThreePointArc((119.5, 16.7), (120.232233047, 14.932233047), (122, 14.2))
            Line((122, 14.2), (125, 14.2))
            ThreePointArc((125, 14.2), (126.767766953, 14.932233047), (127.5, 16.7))
            Line((127.5, 16.7), (127.5, 61.7))
            ThreePointArc((127.5, 61.7), (126.767766953, 63.467766953), (125, 64.2))
            Line((125, 64.2), (122, 64.2))
            ThreePointArc((122, 64.2), (120.232233047, 63.467766953), (119.5, 61.7))
        make_face()
    extrude(amount=-CUT_EXTRUDE5_DEPTH, mode=Mode.SUBTRACT)

    # Sketch28 → Cut-Extrude6 (cut)
    with BuildSketch(Plane(origin=(0, 2, 0), x_dir=(1, 0, 0), z_dir=(0, 1, 0))):
        with Locations((12.876816329, 70.2)):
            Rectangle(SKETCH28_W, SKETCH28_H)
        with Locations((12.876816329, 8.394297438)):
            Rectangle(SKETCH28_W, SKETCH28_H_2)
        with Locations((117.123183672, 8.394297438)):
            Rectangle(SKETCH28_W, SKETCH28_H_2)
        with Locations((117.123183672, 70.2)):
            Rectangle(SKETCH28_W, SKETCH28_H)
    extrude(amount=CUT_EXTRUDE6_DEPTH, mode=Mode.SUBTRACT)


solid = part.part
